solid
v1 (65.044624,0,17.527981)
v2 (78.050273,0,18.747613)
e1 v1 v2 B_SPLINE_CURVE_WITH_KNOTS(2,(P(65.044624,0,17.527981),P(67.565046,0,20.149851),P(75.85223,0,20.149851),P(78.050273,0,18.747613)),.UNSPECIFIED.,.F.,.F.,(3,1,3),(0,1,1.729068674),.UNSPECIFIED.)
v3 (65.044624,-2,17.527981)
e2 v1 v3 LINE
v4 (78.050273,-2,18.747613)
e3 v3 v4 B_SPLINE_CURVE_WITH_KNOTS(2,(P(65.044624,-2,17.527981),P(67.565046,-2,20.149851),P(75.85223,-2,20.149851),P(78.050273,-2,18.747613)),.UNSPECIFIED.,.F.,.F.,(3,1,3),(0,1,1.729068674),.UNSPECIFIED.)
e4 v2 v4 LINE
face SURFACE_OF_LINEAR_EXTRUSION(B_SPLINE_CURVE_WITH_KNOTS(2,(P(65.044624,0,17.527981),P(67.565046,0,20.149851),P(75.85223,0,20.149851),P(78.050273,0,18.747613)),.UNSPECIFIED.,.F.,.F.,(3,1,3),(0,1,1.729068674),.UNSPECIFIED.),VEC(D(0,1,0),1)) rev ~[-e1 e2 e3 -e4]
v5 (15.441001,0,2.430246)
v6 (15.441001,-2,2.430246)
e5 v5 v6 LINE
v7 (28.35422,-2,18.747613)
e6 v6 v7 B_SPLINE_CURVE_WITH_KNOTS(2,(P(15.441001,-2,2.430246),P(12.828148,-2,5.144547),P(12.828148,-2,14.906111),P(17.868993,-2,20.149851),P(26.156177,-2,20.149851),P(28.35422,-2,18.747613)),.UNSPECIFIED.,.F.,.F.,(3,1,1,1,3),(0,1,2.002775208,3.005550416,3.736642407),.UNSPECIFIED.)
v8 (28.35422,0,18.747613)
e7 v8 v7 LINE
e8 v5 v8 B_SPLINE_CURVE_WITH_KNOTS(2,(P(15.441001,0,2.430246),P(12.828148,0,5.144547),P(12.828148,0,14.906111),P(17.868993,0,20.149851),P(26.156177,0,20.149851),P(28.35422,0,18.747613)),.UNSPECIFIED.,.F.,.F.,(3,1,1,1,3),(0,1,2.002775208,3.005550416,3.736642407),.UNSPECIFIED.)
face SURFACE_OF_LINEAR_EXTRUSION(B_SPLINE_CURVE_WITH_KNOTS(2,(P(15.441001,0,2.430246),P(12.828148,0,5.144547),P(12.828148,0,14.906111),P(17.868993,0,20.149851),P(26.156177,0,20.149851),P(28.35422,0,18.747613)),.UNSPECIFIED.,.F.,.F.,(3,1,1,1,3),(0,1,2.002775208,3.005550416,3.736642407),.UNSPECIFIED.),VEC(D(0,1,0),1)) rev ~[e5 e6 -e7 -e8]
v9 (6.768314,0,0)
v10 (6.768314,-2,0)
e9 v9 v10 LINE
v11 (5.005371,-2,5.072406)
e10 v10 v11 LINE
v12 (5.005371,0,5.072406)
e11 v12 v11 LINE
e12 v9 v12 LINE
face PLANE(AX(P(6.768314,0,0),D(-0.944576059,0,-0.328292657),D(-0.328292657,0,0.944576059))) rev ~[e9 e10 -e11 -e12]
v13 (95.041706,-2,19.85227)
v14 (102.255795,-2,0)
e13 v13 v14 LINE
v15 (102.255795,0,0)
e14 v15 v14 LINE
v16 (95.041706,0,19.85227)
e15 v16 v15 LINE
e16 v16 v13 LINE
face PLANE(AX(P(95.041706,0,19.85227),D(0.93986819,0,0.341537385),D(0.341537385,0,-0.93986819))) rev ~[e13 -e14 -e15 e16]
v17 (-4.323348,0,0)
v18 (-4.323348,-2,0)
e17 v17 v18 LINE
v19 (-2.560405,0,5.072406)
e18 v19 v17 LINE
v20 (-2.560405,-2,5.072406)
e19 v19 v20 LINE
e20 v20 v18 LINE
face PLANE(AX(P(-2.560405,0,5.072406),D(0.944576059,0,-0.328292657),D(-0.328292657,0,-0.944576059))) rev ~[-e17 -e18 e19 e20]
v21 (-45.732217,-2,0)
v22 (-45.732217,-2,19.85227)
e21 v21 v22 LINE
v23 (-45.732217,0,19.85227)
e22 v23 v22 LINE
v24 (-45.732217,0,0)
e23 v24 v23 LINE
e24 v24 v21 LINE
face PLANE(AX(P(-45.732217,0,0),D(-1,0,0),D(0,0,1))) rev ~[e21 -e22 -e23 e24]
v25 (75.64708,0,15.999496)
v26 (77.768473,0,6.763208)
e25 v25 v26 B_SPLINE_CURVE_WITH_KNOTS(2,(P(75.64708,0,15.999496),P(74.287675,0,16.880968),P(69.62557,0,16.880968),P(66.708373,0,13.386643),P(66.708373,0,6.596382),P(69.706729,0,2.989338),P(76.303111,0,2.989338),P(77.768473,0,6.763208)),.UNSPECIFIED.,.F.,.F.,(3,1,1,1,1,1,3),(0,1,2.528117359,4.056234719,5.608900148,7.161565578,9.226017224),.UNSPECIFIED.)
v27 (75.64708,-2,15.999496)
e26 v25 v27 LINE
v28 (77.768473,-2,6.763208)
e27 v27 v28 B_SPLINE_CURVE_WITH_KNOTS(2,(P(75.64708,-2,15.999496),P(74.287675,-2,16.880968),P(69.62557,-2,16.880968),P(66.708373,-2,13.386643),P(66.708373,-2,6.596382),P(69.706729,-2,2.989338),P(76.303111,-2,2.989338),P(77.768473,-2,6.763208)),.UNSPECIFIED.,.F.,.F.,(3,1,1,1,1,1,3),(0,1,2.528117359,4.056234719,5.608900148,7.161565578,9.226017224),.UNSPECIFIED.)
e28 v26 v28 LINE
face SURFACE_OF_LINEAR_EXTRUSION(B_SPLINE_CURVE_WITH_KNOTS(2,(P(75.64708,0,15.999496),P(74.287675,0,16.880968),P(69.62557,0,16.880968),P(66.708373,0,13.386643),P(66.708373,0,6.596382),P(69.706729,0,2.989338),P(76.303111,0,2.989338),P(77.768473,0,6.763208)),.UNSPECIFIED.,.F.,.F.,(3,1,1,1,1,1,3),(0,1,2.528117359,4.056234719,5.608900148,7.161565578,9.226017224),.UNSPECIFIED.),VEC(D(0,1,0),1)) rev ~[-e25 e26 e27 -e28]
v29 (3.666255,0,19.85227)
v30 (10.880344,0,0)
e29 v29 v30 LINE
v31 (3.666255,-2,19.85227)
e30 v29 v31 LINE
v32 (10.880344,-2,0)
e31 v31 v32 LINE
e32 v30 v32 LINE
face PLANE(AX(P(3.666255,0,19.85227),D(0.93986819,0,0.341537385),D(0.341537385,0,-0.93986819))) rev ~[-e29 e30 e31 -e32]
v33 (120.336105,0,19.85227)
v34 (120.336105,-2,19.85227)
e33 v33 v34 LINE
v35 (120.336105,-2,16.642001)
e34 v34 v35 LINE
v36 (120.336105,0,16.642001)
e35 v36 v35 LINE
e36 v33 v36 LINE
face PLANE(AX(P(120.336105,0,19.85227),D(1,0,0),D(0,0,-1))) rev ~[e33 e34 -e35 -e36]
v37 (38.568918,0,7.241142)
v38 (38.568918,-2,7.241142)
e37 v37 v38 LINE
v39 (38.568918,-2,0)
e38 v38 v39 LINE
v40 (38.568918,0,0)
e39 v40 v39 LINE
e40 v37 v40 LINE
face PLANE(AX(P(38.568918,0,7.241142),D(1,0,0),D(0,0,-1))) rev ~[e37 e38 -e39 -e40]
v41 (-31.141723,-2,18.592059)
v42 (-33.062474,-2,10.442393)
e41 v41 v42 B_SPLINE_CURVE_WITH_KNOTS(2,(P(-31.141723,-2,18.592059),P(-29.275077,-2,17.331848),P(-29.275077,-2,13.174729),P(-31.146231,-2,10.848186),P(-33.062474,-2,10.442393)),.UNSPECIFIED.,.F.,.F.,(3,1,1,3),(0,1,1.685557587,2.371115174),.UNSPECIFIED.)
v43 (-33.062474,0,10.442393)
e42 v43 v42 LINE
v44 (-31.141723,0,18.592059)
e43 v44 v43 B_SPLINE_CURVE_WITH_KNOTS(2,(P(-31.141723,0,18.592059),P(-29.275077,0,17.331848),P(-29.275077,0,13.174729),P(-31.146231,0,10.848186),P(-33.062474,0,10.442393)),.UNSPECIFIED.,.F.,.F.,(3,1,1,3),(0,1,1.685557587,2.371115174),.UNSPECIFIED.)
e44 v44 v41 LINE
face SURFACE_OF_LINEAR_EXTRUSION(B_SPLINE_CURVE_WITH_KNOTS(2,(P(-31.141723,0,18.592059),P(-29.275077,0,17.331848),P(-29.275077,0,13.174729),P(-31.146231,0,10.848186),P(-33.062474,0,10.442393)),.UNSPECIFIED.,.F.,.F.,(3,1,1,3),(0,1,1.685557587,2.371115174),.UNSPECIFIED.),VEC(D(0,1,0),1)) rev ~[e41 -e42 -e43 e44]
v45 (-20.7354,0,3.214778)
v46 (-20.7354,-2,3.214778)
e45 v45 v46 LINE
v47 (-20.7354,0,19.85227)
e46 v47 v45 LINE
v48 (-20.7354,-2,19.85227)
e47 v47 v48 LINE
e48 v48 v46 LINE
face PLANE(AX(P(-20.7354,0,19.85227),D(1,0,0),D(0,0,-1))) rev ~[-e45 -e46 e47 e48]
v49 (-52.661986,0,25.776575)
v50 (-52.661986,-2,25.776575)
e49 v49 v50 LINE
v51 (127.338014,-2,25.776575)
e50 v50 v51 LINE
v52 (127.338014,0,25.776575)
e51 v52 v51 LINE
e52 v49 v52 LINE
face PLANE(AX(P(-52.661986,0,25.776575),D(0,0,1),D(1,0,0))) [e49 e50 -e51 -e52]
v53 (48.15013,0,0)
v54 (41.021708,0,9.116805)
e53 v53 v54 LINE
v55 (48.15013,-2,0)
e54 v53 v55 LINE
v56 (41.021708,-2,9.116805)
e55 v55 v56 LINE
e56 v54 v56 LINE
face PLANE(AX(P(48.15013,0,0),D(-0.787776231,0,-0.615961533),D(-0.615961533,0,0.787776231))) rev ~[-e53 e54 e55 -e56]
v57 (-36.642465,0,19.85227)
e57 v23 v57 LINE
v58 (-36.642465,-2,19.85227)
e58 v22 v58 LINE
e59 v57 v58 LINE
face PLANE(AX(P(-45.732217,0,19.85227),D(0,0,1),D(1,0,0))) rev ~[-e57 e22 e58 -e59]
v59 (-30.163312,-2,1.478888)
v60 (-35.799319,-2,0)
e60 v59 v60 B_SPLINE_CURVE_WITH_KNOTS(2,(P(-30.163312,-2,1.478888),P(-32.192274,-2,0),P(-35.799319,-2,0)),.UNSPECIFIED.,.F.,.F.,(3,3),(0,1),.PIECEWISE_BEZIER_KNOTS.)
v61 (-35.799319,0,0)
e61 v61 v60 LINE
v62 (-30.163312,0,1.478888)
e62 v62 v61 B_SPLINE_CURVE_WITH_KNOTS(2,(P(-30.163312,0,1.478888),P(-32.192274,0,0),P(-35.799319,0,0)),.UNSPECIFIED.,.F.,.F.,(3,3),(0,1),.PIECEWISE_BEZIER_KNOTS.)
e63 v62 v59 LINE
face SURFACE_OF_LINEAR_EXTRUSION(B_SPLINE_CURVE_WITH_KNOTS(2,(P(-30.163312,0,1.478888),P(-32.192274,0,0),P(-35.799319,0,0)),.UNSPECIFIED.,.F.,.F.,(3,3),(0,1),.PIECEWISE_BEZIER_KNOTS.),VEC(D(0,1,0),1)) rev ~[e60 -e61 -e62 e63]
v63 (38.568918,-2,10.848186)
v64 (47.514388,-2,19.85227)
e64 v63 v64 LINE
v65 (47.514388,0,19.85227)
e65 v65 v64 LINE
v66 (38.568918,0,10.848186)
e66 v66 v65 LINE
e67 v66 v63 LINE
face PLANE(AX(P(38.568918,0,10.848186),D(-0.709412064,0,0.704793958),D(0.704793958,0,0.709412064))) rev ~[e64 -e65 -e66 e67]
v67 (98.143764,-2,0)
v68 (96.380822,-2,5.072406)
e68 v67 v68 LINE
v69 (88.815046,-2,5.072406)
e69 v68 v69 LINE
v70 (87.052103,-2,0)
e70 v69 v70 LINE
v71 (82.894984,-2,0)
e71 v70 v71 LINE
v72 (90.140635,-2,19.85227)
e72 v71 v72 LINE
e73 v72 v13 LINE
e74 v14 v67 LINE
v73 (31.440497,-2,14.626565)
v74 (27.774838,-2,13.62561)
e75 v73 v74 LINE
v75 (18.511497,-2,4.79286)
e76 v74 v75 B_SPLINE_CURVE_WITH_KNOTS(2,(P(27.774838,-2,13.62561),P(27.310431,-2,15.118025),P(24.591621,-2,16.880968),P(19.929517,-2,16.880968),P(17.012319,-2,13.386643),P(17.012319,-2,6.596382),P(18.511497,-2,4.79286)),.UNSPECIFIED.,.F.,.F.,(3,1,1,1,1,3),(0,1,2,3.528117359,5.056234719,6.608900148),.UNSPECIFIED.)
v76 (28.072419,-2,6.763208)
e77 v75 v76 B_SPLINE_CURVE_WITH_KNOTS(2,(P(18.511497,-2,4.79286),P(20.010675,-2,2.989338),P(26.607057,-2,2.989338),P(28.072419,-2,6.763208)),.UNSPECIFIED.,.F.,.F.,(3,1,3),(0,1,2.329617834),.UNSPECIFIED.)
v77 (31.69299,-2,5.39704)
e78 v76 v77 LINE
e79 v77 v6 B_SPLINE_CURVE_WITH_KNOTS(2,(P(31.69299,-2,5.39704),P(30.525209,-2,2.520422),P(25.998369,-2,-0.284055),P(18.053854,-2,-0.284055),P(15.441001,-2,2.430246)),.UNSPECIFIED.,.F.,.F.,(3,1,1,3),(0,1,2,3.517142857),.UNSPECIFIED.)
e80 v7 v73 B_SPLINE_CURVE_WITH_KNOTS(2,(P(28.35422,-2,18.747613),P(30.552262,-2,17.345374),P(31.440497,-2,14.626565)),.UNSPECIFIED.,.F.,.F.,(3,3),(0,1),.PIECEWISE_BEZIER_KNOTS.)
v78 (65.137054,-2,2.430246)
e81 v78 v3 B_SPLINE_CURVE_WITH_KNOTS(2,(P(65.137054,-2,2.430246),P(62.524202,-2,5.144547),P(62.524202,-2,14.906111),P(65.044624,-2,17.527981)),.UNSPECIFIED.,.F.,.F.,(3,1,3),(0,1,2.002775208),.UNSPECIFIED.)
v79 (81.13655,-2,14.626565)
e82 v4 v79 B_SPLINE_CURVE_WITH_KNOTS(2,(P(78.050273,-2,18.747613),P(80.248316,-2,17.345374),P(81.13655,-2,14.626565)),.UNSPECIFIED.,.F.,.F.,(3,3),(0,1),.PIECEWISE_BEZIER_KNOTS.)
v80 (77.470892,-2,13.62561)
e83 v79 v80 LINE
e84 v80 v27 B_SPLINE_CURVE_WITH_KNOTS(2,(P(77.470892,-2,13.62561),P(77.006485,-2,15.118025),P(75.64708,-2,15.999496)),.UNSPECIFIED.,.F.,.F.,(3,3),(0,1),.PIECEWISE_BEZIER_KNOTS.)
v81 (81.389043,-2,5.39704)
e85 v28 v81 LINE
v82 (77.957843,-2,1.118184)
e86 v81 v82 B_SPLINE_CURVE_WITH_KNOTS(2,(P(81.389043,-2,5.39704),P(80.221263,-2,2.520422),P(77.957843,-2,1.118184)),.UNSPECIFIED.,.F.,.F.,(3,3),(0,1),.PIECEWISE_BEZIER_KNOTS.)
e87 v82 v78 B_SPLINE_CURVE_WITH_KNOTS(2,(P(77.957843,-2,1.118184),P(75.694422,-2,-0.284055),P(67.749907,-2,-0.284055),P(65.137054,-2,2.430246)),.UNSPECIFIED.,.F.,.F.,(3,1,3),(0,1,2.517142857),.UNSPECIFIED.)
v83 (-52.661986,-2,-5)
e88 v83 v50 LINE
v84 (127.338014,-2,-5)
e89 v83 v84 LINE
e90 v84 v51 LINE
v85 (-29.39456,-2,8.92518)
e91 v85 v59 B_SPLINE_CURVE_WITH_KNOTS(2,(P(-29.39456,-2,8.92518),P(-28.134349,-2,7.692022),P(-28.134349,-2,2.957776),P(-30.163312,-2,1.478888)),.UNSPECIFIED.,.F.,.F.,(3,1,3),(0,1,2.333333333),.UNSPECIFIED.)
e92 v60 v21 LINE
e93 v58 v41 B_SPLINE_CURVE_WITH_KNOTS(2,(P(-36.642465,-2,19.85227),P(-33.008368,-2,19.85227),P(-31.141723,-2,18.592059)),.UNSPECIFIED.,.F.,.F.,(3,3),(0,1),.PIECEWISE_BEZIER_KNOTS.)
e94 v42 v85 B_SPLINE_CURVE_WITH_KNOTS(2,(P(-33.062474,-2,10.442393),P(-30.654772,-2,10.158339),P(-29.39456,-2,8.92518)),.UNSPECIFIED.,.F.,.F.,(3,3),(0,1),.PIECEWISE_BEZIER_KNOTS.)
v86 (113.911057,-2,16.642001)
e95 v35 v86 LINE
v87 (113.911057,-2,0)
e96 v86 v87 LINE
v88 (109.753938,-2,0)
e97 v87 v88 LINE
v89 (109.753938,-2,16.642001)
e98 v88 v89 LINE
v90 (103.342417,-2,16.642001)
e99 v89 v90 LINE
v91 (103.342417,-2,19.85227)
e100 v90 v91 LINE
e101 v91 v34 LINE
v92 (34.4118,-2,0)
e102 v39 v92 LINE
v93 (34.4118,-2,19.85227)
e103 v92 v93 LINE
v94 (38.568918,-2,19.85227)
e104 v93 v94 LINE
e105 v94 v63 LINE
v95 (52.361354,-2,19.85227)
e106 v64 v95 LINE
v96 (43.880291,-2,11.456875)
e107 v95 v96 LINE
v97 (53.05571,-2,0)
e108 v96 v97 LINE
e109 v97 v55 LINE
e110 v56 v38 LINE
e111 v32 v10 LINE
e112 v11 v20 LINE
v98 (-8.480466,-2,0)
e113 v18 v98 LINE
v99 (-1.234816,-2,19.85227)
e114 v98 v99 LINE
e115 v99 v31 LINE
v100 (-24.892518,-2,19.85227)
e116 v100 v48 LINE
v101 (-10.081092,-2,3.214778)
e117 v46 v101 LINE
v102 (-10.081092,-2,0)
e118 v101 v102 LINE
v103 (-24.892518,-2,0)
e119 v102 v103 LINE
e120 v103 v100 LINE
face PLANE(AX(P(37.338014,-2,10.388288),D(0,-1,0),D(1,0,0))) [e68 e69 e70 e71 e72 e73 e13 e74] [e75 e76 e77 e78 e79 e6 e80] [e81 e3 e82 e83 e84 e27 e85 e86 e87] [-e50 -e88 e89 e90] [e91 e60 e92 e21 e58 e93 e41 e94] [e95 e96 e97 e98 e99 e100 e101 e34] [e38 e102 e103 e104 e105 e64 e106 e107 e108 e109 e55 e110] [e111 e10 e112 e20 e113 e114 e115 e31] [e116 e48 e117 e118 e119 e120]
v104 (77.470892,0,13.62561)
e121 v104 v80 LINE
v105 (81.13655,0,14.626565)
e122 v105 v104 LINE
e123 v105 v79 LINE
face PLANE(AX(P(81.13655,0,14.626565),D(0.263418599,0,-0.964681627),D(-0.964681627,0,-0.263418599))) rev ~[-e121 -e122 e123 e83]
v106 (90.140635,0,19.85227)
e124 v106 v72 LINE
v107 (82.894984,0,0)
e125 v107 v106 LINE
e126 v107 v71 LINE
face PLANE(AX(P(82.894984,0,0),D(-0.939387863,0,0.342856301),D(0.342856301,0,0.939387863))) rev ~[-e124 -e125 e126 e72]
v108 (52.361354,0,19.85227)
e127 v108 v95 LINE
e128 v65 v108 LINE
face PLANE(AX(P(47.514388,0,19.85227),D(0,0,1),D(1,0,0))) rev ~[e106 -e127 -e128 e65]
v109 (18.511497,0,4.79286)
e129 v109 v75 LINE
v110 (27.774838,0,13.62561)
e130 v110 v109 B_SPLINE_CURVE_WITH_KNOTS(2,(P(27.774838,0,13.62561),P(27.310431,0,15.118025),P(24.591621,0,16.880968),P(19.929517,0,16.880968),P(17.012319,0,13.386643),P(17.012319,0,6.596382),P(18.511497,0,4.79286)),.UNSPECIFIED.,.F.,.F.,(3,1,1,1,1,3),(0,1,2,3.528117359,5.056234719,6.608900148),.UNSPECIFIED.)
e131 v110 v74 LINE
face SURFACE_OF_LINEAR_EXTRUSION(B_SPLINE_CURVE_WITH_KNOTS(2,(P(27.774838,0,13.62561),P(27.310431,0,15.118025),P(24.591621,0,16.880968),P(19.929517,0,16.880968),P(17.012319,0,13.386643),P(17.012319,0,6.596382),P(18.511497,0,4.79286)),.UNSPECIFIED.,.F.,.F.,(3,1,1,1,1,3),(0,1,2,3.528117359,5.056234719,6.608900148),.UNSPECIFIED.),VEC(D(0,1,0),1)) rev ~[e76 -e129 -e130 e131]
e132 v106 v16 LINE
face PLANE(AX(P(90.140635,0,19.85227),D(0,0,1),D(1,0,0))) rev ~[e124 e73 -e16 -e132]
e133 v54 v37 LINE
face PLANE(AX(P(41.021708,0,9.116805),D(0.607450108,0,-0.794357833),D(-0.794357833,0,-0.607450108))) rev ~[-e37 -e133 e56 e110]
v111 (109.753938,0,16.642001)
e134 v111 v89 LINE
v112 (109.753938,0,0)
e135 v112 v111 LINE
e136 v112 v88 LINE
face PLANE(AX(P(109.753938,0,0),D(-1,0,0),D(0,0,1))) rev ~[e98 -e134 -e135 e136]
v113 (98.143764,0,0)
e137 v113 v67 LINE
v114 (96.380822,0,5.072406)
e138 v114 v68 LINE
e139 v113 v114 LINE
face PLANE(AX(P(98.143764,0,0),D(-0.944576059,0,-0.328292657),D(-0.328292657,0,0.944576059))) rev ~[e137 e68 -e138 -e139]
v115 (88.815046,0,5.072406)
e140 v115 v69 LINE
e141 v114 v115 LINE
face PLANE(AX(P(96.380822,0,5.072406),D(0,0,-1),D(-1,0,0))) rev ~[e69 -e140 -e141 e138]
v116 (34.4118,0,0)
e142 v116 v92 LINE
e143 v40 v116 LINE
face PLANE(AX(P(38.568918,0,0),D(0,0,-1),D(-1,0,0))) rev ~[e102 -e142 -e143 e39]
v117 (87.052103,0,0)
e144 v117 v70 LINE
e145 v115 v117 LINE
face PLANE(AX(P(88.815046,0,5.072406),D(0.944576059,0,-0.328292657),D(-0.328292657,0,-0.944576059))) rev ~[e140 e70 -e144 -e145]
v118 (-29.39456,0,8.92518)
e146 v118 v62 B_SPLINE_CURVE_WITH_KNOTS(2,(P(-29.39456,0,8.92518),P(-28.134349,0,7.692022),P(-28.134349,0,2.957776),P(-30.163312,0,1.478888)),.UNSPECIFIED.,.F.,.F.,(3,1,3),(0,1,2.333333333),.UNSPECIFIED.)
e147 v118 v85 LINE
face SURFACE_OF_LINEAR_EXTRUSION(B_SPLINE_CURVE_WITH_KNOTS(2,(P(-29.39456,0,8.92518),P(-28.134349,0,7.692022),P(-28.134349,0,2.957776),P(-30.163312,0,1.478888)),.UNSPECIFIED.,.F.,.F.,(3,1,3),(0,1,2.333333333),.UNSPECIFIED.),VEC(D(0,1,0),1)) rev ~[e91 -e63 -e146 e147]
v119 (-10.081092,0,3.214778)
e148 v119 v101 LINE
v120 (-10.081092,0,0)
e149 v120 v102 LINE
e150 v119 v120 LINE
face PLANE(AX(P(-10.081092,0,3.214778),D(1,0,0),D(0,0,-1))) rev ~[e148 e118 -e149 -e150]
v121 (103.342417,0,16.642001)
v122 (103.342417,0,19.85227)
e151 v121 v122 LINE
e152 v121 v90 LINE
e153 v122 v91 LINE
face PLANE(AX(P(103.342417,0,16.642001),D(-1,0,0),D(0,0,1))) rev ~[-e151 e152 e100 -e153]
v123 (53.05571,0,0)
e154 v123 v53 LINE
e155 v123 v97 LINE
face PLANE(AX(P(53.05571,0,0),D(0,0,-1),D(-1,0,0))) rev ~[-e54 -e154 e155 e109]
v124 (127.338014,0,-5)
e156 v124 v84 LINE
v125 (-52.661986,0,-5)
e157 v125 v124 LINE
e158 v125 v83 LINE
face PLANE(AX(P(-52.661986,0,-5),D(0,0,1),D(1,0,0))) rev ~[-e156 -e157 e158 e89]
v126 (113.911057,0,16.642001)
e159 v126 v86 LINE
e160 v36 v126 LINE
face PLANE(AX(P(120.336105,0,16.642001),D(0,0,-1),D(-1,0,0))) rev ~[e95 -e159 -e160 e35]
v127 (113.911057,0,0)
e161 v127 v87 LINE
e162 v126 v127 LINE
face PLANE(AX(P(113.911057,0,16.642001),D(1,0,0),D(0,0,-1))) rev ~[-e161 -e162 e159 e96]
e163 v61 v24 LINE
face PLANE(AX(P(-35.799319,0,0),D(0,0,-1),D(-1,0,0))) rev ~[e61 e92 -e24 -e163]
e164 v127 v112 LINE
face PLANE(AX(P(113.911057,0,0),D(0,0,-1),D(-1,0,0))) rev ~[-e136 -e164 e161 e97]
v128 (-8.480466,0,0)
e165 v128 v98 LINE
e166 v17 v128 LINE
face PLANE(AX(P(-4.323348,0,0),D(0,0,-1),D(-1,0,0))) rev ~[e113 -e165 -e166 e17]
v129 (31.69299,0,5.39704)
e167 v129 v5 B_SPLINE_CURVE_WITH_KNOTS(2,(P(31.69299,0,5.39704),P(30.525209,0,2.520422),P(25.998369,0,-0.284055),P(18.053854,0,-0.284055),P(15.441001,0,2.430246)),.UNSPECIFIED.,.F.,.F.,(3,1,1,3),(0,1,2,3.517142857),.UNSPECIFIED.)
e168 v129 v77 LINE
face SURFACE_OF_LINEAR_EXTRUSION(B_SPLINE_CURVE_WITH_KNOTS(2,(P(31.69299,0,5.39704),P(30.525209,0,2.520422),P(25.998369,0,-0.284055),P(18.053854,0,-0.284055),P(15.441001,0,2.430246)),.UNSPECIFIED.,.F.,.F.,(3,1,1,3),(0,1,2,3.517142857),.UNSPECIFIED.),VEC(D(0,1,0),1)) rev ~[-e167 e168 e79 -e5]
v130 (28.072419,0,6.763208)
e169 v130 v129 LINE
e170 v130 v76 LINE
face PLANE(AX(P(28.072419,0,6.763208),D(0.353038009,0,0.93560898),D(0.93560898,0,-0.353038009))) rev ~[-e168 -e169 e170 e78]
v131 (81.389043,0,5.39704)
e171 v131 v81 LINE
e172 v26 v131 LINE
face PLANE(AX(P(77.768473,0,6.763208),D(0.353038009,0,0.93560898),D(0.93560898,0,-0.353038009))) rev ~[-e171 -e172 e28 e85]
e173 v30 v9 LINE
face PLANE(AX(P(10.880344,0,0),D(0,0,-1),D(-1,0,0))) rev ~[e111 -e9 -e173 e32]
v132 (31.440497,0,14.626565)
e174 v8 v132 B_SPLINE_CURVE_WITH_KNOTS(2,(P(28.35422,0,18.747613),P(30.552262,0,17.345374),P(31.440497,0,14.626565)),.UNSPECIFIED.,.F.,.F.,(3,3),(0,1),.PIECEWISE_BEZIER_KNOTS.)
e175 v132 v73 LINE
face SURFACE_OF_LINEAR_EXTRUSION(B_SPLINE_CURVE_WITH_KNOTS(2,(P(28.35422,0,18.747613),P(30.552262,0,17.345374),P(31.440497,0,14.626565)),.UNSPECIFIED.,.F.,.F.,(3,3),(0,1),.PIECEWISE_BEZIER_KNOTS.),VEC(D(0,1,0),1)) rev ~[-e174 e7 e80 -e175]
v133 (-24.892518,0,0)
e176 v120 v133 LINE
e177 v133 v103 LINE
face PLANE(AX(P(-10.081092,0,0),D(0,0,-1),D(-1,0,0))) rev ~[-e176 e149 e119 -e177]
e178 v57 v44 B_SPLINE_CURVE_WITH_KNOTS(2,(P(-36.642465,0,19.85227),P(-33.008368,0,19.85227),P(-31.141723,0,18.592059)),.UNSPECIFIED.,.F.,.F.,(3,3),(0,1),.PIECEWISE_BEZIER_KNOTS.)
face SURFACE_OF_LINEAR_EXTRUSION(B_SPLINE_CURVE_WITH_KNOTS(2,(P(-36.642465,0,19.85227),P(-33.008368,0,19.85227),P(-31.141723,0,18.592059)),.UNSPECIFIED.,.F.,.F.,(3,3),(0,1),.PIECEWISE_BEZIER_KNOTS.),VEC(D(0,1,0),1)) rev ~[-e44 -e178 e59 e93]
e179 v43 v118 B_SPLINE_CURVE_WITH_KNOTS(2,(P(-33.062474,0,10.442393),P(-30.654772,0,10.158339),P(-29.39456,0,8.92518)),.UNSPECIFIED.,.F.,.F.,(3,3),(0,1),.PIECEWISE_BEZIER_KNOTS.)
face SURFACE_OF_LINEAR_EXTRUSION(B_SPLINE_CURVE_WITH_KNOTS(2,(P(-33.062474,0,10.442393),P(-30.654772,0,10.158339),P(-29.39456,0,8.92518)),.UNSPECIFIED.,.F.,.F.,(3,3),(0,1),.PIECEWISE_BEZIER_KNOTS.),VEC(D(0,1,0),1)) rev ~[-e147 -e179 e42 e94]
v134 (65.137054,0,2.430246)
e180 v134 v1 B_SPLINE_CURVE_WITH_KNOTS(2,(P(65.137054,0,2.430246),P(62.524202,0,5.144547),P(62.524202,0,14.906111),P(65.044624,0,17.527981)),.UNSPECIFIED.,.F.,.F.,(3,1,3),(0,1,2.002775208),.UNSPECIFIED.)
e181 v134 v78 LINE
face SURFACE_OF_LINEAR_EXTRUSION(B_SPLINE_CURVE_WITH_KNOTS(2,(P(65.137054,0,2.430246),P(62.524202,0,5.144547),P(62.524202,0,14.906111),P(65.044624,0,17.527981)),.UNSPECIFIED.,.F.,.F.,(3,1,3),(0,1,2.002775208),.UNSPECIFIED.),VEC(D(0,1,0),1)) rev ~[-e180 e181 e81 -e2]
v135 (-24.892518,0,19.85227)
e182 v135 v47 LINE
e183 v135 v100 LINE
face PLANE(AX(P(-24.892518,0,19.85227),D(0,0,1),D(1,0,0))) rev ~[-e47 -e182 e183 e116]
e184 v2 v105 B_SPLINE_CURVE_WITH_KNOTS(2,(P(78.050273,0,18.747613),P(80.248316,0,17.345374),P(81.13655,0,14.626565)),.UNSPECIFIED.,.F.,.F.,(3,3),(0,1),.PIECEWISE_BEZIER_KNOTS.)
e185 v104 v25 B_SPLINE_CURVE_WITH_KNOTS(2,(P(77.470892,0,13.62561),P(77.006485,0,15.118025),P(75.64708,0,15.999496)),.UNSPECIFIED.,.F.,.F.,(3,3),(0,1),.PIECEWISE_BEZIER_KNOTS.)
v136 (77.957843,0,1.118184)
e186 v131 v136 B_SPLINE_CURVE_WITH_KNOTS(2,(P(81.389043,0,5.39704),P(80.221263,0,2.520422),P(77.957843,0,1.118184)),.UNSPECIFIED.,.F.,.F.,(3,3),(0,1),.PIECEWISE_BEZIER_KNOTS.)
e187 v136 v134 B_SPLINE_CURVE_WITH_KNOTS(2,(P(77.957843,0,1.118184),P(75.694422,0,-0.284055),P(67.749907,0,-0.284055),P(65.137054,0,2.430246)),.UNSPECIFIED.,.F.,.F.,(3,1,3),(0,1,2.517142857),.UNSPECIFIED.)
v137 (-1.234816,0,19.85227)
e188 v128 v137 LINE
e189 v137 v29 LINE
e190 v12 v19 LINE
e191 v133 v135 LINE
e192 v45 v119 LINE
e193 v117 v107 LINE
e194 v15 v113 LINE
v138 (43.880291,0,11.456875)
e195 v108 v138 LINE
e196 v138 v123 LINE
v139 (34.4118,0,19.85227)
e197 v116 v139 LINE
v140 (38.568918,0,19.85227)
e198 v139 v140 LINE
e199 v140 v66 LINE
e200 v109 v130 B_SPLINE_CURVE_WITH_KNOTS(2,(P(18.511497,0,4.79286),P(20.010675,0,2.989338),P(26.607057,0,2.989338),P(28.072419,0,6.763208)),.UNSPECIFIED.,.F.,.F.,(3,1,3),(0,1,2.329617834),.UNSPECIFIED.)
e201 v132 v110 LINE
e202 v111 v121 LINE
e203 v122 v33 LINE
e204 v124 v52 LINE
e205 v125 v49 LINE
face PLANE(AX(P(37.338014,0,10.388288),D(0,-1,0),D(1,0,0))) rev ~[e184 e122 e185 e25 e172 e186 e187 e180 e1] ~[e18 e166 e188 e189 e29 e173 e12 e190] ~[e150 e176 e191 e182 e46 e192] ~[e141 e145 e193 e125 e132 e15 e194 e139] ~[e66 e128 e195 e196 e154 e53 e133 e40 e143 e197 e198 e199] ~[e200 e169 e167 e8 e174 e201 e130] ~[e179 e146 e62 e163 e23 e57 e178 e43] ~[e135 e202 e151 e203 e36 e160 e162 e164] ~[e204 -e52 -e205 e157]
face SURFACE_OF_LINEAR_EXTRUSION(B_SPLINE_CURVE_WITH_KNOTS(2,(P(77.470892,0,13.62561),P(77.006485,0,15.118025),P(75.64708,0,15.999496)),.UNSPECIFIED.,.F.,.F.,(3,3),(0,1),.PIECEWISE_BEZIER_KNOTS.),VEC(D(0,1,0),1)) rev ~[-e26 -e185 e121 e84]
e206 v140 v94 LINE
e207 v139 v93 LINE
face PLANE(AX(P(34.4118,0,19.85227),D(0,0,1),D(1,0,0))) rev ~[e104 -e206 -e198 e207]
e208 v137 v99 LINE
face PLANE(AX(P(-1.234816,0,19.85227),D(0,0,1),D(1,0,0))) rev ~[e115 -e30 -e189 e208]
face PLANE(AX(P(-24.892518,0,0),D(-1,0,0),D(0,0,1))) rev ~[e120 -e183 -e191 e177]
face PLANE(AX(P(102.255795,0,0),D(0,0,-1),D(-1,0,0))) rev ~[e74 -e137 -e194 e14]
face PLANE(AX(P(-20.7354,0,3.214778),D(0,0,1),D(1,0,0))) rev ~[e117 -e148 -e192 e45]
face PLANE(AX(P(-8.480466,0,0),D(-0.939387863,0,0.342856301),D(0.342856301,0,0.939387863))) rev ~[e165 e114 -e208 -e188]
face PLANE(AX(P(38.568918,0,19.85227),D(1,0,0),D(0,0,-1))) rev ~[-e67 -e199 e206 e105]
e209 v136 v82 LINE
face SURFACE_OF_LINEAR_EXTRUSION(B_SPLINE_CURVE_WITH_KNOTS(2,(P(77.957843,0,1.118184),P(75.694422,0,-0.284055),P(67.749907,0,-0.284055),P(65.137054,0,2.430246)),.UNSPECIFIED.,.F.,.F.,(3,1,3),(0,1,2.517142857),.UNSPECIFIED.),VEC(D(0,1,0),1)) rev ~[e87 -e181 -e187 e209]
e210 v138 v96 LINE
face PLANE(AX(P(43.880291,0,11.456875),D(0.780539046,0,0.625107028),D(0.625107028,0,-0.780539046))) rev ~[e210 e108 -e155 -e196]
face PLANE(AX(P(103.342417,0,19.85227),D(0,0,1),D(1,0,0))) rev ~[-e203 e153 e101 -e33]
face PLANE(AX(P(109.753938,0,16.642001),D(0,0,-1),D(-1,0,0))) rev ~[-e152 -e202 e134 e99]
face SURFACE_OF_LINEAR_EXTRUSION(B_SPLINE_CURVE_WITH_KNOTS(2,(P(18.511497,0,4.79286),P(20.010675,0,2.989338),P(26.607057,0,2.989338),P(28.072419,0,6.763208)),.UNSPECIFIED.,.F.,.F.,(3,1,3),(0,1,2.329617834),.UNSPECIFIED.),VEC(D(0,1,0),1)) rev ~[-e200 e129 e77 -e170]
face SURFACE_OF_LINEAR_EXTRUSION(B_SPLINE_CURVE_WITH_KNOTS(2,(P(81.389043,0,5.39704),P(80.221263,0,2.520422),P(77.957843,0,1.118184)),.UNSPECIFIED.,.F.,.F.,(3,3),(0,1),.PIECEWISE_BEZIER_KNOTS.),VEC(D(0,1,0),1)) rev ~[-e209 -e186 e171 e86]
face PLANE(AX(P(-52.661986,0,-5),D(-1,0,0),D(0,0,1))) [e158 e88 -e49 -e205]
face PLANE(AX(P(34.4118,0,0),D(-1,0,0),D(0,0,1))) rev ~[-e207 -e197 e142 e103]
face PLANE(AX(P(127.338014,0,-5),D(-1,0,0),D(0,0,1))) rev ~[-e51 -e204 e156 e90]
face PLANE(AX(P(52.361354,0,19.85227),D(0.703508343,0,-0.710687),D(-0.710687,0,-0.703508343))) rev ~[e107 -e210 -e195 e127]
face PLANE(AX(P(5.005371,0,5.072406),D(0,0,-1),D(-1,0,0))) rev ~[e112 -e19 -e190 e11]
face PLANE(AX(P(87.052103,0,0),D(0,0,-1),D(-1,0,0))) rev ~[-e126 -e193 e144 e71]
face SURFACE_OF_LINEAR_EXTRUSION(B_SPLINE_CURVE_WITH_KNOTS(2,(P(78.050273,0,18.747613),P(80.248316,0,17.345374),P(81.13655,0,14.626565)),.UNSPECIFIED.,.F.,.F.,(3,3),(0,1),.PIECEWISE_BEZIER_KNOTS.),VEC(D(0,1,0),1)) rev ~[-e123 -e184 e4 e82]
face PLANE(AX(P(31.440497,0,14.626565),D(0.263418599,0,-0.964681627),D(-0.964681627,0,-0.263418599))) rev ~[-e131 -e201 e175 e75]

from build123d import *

# Parameters (mm, degrees)
F0_W     = 180
F0_H     = 30.7765754297
F1_DEPTH = 2


with BuildPart() as f1:
    # F0 (on Front) → F1 (new body)
    with BuildSketch(Plane.XZ):
        with Locations((37.3380143768, 10.3882877148)):
            Rectangle(F0_W, F0_H)
        with BuildLine():
            add(Edge.make_bspline(
                [(-29.3945604163, 8.9251803522), (-28.1343492982, 7.6920220666), (-28.1343492982, 5.6630596223)],
                knots=[0, 0, 0, 1, 1, 1], degree=2))
            add(Edge.make_bspline(
                [(-28.1343492982, 5.6630596223), (-28.1343492982, 2.9577763633), (-30.1633117425, 1.4788881816)],
                knots=[0, 0, 0, 1, 1, 1], degree=2))
            add(Edge.make_bspline(
                [(-30.1633117425, 1.4788881816), (-32.1922741868, 0), (-35.7993185322, 0)],
                knots=[0, 0, 0, 1, 1, 1], degree=2))
            Line((-35.7993185322, 0), (-45.7322168984, 0))
            Line((-45.7322168984, 0), (-45.7322168984, 19.8522703161))
            Line((-45.7322168984, 19.8522703161), (-36.6424651479, 19.8522703161))
            add(Edge.make_bspline(
                [(-36.6424651479, 19.8522703161), (-33.0083679699, 19.8522703161), (-31.1417225212, 18.592059198)],
                knots=[0, 0, 0, 1, 1, 1], degree=2))
            add(Edge.make_bspline(
                [(-31.1417225212, 18.592059198), (-29.2750770724, 17.3318480798), (-29.2750770724, 14.8655315086)],
                knots=[0, 0, 0, 1, 1, 1], degree=2))
            add(Edge.make_bspline(
                [(-29.2750770724, 14.8655315086), (-29.2750770724, 13.1747294717), (-30.2106541995, 12.0114576703)],
                knots=[0, 0, 0, 1, 1, 1], degree=2))
            add(Edge.make_bspline(
                [(-30.2106541995, 12.0114576703), (-31.1462313266, 10.8481858689), (-33.0624736351, 10.44239338)],
                knots=[0, 0, 0, 1, 1, 1], degree=2))
            add(Edge.make_bspline(
                [(-33.0624736351, 10.44239338), (-30.6547715345, 10.1583386378), (-29.3945604163, 8.9251803522)],
                knots=[0, 0, 0, 1, 1, 1], degree=2))
        make_face(mode=Mode.SUBTRACT)
        Polygon((-10.0810923493, 0), (-24.8925181927, 0), (-24.8925181927, 19.8522703161), (-20.7353995846, 19.8522703161), (-20.7353995846, 3.2147782729), (-10.0810923493, 3.2147782729), align=None, mode=Mode.SUBTRACT)
        Polygon((10.8803441031, 0), (6.7683135493, 0), (5.0053706255, 5.0724061108), (-2.5604048891, 5.0724061108), (-4.3233478129, 0), (-8.480466421, 0), (-1.2348160921, 19.8522703161), (3.6662554122, 19.8522703161), align=None, mode=Mode.SUBTRACT)
        with BuildLine():
            add(Edge.make_bspline(
                [(18.5114972964, 4.792860174), (20.0106751024, 2.9893380013), (22.8422049136, 2.9893380013)],
                knots=[0, 0, 0, 1, 1, 1], degree=2))
            add(Edge.make_bspline(
                [(22.8422049136, 2.9893380013), (26.6070574491, 2.9893380013), (28.0724192145, 6.7632081477)],
                knots=[0, 0, 0, 1, 1, 1], degree=2))
            Line((28.0724192145, 6.7632081477), (31.6929899762, 5.3970401018))
            add(Edge.make_bspline(
                [(31.6929899762, 5.3970401018), (30.5252093694, 2.5204222364), (28.2617890426, 1.1181837471)],
                knots=[0, 0, 0, 1, 1, 1], degree=2))
            add(Edge.make_bspline(
                [(28.2617890426, 1.1181837471), (25.9983687158, -0.2840547422), (22.8422049136, -0.2840547422)],
                knots=[0, 0, 0, 1, 1, 1], degree=2))
            add(Edge.make_bspline(
                [(22.8422049136, -0.2840547422), (18.053853545, -0.2840547422), (15.4410007973, 2.4302461277)],
                knots=[0, 0, 0, 1, 1, 1], degree=2))
            add(Edge.make_bspline(
                [(15.4410007973, 2.4302461277), (12.8281480496, 5.1445469977), (12.8281480496, 10.0185656694)],
                knots=[0, 0, 0, 1, 1, 1], degree=2))
            add(Edge.make_bspline(
                [(12.8281480496, 10.0185656694), (12.8281480496, 14.9061107575), (15.348570286, 17.5279811161)],
                knots=[0, 0, 0, 1, 1, 1], degree=2))
            add(Edge.make_bspline(
                [(15.348570286, 17.5279811161), (17.8689925223, 20.1498514746), (22.6618526963, 20.1498514746)],
                knots=[0, 0, 0, 1, 1, 1], degree=2))
            add(Edge.make_bspline(
                [(22.6618526963, 20.1498514746), (26.156176906, 20.1498514746), (28.3542195539, 18.7476129854)],
                knots=[0, 0, 0, 1, 1, 1], degree=2))
            add(Edge.make_bspline(
                [(28.3542195539, 18.7476129854), (30.5522622019, 17.3453744961), (31.440496872, 14.6265648207)],
                knots=[0, 0, 0, 1, 1, 1], degree=2))
            Line((31.440496872, 14.6265648207), (27.774838056, 13.6256100149))
            add(Edge.make_bspline(
                [(27.774838056, 13.6256100149), (27.3104310965, 15.1180246128), (25.9510262588, 15.9994960747)],
                knots=[0, 0, 0, 1, 1, 1], degree=2))
            add(Edge.make_bspline(
                [(25.9510262588, 15.9994960747), (24.5916214211, 16.8809675366), (22.7475199995, 16.8809675366)],
                knots=[0, 0, 0, 1, 1, 1], degree=2))
            add(Edge.make_bspline(
                [(22.7475199995, 16.8809675366), (19.9295166047, 16.8809675366), (18.4709180475, 15.1338054318)],
                knots=[0, 0, 0, 1, 1, 1], degree=2))
            add(Edge.make_bspline(
                [(18.4709180475, 15.1338054318), (17.0123194903, 13.386643327), (17.0123194903, 10.0185656694)],
                knots=[0, 0, 0, 1, 1, 1], degree=2))
            add(Edge.make_bspline(
                [(17.0123194903, 10.0185656694), (17.0123194903, 6.5963823467), (18.5114972964, 4.792860174)],
                knots=[0, 0, 0, 1, 1, 1], degree=2))
        make_face(mode=Mode.SUBTRACT)
        Polygon((53.055710112, 0), (48.1501298022, 0), (41.0217084145, 9.1168045831), (38.5689182597, 7.2411415234), (38.5689182597, 0), (34.4117996515, 0), (34.4117996515, 19.8522703161), (38.5689182597, 19.8522703161), (38.5689182597, 10.8481858689), (47.5143882363, 19.8522703161), (52.3613540755, 19.8522703161), (43.8802910583, 11.4568746022), align=None, mode=Mode.SUBTRACT)
        with BuildLine():
            add(Edge.make_bspline(
                [(68.2075507655, 4.792860174), (69.7067285716, 2.9893380013), (72.5382583827, 2.9893380013)],
                knots=[0, 0, 0, 1, 1, 1], degree=2))
            add(Edge.make_bspline(
                [(72.5382583827, 2.9893380013), (76.3031109183, 2.9893380013), (77.7684726836, 6.7632081477)],
                knots=[0, 0, 0, 1, 1, 1], degree=2))
            Line((77.7684726836, 6.7632081477), (81.3890434453, 5.3970401018))
            add(Edge.make_bspline(
                [(81.3890434453, 5.3970401018), (80.2212628385, 2.5204222364), (77.9578425117, 1.1181837471)],
                knots=[0, 0, 0, 1, 1, 1], degree=2))
            add(Edge.make_bspline(
                [(77.9578425117, 1.1181837471), (75.694422185, -0.2840547422), (72.5382583827, -0.2840547422)],
                knots=[0, 0, 0, 1, 1, 1], degree=2))
            add(Edge.make_bspline(
                [(72.5382583827, -0.2840547422), (67.7499070142, -0.2840547422), (65.1370542664, 2.4302461277)],
                knots=[0, 0, 0, 1, 1, 1], degree=2))
            add(Edge.make_bspline(
                [(65.1370542664, 2.4302461277), (62.5242015187, 5.1445469977), (62.5242015187, 10.0185656694)],
                knots=[0, 0, 0, 1, 1, 1], degree=2))
            add(Edge.make_bspline(
                [(62.5242015187, 10.0185656694), (62.5242015187, 14.9061107575), (65.0446237551, 17.5279811161)],
                knots=[0, 0, 0, 1, 1, 1], degree=2))
            add(Edge.make_bspline(
                [(65.0446237551, 17.5279811161), (67.5650459915, 20.1498514746), (72.3579061654, 20.1498514746)],
                knots=[0, 0, 0, 1, 1, 1], degree=2))
            add(Edge.make_bspline(
                [(72.3579061654, 20.1498514746), (75.8522303751, 20.1498514746), (78.0502730231, 18.7476129854)],
                knots=[0, 0, 0, 1, 1, 1], degree=2))
            add(Edge.make_bspline(
                [(78.0502730231, 18.7476129854), (80.2483156711, 17.3453744961), (81.1365503411, 14.6265648207)],
                knots=[0, 0, 0, 1, 1, 1], degree=2))
            Line((81.1365503411, 14.6265648207), (77.4708915251, 13.6256100149))
            add(Edge.make_bspline(
                [(77.4708915251, 13.6256100149), (77.0064845656, 15.1180246128), (75.6470797279, 15.9994960747)],
                knots=[0, 0, 0, 1, 1, 1], degree=2))
            add(Edge.make_bspline(
                [(75.6470797279, 15.9994960747), (74.2876748903, 16.8809675366), (72.4435734687, 16.8809675366)],
                knots=[0, 0, 0, 1, 1, 1], degree=2))
            add(Edge.make_bspline(
                [(72.4435734687, 16.8809675366), (69.6255700738, 16.8809675366), (68.1669715166, 15.1338054318)],
                knots=[0, 0, 0, 1, 1, 1], degree=2))
            add(Edge.make_bspline(
                [(68.1669715166, 15.1338054318), (66.7083729594, 13.386643327), (66.7083729594, 10.0185656694)],
                knots=[0, 0, 0, 1, 1, 1], degree=2))
            add(Edge.make_bspline(
                [(66.7083729594, 10.0185656694), (66.7083729594, 6.5963823467), (68.2075507655, 4.792860174)],
                knots=[0, 0, 0, 1, 1, 1], degree=2))
        make_face(mode=Mode.SUBTRACT)
        Polygon((102.2557949836, 0), (98.1437644298, 0), (96.380821506, 5.0724061108), (88.8150459915, 5.0724061108), (87.0521030676, 0), (82.8949844595, 0), (90.1406347884, 19.8522703161), (95.0417062928, 19.8522703161), align=None, mode=Mode.SUBTRACT)
        Polygon((120.3361047651, 16.6420008487), (113.9110570248, 16.6420008487), (113.9110570248, 0), (109.7539384167, 0), (109.7539384167, 16.6420008487), (103.3424170927, 16.6420008487), (103.3424170927, 19.8522703161), (120.3361047651, 19.8522703161), align=None, mode=Mode.SUBTRACT)
    extrude(amount=F1_DEPTH)


solid = f1.part
